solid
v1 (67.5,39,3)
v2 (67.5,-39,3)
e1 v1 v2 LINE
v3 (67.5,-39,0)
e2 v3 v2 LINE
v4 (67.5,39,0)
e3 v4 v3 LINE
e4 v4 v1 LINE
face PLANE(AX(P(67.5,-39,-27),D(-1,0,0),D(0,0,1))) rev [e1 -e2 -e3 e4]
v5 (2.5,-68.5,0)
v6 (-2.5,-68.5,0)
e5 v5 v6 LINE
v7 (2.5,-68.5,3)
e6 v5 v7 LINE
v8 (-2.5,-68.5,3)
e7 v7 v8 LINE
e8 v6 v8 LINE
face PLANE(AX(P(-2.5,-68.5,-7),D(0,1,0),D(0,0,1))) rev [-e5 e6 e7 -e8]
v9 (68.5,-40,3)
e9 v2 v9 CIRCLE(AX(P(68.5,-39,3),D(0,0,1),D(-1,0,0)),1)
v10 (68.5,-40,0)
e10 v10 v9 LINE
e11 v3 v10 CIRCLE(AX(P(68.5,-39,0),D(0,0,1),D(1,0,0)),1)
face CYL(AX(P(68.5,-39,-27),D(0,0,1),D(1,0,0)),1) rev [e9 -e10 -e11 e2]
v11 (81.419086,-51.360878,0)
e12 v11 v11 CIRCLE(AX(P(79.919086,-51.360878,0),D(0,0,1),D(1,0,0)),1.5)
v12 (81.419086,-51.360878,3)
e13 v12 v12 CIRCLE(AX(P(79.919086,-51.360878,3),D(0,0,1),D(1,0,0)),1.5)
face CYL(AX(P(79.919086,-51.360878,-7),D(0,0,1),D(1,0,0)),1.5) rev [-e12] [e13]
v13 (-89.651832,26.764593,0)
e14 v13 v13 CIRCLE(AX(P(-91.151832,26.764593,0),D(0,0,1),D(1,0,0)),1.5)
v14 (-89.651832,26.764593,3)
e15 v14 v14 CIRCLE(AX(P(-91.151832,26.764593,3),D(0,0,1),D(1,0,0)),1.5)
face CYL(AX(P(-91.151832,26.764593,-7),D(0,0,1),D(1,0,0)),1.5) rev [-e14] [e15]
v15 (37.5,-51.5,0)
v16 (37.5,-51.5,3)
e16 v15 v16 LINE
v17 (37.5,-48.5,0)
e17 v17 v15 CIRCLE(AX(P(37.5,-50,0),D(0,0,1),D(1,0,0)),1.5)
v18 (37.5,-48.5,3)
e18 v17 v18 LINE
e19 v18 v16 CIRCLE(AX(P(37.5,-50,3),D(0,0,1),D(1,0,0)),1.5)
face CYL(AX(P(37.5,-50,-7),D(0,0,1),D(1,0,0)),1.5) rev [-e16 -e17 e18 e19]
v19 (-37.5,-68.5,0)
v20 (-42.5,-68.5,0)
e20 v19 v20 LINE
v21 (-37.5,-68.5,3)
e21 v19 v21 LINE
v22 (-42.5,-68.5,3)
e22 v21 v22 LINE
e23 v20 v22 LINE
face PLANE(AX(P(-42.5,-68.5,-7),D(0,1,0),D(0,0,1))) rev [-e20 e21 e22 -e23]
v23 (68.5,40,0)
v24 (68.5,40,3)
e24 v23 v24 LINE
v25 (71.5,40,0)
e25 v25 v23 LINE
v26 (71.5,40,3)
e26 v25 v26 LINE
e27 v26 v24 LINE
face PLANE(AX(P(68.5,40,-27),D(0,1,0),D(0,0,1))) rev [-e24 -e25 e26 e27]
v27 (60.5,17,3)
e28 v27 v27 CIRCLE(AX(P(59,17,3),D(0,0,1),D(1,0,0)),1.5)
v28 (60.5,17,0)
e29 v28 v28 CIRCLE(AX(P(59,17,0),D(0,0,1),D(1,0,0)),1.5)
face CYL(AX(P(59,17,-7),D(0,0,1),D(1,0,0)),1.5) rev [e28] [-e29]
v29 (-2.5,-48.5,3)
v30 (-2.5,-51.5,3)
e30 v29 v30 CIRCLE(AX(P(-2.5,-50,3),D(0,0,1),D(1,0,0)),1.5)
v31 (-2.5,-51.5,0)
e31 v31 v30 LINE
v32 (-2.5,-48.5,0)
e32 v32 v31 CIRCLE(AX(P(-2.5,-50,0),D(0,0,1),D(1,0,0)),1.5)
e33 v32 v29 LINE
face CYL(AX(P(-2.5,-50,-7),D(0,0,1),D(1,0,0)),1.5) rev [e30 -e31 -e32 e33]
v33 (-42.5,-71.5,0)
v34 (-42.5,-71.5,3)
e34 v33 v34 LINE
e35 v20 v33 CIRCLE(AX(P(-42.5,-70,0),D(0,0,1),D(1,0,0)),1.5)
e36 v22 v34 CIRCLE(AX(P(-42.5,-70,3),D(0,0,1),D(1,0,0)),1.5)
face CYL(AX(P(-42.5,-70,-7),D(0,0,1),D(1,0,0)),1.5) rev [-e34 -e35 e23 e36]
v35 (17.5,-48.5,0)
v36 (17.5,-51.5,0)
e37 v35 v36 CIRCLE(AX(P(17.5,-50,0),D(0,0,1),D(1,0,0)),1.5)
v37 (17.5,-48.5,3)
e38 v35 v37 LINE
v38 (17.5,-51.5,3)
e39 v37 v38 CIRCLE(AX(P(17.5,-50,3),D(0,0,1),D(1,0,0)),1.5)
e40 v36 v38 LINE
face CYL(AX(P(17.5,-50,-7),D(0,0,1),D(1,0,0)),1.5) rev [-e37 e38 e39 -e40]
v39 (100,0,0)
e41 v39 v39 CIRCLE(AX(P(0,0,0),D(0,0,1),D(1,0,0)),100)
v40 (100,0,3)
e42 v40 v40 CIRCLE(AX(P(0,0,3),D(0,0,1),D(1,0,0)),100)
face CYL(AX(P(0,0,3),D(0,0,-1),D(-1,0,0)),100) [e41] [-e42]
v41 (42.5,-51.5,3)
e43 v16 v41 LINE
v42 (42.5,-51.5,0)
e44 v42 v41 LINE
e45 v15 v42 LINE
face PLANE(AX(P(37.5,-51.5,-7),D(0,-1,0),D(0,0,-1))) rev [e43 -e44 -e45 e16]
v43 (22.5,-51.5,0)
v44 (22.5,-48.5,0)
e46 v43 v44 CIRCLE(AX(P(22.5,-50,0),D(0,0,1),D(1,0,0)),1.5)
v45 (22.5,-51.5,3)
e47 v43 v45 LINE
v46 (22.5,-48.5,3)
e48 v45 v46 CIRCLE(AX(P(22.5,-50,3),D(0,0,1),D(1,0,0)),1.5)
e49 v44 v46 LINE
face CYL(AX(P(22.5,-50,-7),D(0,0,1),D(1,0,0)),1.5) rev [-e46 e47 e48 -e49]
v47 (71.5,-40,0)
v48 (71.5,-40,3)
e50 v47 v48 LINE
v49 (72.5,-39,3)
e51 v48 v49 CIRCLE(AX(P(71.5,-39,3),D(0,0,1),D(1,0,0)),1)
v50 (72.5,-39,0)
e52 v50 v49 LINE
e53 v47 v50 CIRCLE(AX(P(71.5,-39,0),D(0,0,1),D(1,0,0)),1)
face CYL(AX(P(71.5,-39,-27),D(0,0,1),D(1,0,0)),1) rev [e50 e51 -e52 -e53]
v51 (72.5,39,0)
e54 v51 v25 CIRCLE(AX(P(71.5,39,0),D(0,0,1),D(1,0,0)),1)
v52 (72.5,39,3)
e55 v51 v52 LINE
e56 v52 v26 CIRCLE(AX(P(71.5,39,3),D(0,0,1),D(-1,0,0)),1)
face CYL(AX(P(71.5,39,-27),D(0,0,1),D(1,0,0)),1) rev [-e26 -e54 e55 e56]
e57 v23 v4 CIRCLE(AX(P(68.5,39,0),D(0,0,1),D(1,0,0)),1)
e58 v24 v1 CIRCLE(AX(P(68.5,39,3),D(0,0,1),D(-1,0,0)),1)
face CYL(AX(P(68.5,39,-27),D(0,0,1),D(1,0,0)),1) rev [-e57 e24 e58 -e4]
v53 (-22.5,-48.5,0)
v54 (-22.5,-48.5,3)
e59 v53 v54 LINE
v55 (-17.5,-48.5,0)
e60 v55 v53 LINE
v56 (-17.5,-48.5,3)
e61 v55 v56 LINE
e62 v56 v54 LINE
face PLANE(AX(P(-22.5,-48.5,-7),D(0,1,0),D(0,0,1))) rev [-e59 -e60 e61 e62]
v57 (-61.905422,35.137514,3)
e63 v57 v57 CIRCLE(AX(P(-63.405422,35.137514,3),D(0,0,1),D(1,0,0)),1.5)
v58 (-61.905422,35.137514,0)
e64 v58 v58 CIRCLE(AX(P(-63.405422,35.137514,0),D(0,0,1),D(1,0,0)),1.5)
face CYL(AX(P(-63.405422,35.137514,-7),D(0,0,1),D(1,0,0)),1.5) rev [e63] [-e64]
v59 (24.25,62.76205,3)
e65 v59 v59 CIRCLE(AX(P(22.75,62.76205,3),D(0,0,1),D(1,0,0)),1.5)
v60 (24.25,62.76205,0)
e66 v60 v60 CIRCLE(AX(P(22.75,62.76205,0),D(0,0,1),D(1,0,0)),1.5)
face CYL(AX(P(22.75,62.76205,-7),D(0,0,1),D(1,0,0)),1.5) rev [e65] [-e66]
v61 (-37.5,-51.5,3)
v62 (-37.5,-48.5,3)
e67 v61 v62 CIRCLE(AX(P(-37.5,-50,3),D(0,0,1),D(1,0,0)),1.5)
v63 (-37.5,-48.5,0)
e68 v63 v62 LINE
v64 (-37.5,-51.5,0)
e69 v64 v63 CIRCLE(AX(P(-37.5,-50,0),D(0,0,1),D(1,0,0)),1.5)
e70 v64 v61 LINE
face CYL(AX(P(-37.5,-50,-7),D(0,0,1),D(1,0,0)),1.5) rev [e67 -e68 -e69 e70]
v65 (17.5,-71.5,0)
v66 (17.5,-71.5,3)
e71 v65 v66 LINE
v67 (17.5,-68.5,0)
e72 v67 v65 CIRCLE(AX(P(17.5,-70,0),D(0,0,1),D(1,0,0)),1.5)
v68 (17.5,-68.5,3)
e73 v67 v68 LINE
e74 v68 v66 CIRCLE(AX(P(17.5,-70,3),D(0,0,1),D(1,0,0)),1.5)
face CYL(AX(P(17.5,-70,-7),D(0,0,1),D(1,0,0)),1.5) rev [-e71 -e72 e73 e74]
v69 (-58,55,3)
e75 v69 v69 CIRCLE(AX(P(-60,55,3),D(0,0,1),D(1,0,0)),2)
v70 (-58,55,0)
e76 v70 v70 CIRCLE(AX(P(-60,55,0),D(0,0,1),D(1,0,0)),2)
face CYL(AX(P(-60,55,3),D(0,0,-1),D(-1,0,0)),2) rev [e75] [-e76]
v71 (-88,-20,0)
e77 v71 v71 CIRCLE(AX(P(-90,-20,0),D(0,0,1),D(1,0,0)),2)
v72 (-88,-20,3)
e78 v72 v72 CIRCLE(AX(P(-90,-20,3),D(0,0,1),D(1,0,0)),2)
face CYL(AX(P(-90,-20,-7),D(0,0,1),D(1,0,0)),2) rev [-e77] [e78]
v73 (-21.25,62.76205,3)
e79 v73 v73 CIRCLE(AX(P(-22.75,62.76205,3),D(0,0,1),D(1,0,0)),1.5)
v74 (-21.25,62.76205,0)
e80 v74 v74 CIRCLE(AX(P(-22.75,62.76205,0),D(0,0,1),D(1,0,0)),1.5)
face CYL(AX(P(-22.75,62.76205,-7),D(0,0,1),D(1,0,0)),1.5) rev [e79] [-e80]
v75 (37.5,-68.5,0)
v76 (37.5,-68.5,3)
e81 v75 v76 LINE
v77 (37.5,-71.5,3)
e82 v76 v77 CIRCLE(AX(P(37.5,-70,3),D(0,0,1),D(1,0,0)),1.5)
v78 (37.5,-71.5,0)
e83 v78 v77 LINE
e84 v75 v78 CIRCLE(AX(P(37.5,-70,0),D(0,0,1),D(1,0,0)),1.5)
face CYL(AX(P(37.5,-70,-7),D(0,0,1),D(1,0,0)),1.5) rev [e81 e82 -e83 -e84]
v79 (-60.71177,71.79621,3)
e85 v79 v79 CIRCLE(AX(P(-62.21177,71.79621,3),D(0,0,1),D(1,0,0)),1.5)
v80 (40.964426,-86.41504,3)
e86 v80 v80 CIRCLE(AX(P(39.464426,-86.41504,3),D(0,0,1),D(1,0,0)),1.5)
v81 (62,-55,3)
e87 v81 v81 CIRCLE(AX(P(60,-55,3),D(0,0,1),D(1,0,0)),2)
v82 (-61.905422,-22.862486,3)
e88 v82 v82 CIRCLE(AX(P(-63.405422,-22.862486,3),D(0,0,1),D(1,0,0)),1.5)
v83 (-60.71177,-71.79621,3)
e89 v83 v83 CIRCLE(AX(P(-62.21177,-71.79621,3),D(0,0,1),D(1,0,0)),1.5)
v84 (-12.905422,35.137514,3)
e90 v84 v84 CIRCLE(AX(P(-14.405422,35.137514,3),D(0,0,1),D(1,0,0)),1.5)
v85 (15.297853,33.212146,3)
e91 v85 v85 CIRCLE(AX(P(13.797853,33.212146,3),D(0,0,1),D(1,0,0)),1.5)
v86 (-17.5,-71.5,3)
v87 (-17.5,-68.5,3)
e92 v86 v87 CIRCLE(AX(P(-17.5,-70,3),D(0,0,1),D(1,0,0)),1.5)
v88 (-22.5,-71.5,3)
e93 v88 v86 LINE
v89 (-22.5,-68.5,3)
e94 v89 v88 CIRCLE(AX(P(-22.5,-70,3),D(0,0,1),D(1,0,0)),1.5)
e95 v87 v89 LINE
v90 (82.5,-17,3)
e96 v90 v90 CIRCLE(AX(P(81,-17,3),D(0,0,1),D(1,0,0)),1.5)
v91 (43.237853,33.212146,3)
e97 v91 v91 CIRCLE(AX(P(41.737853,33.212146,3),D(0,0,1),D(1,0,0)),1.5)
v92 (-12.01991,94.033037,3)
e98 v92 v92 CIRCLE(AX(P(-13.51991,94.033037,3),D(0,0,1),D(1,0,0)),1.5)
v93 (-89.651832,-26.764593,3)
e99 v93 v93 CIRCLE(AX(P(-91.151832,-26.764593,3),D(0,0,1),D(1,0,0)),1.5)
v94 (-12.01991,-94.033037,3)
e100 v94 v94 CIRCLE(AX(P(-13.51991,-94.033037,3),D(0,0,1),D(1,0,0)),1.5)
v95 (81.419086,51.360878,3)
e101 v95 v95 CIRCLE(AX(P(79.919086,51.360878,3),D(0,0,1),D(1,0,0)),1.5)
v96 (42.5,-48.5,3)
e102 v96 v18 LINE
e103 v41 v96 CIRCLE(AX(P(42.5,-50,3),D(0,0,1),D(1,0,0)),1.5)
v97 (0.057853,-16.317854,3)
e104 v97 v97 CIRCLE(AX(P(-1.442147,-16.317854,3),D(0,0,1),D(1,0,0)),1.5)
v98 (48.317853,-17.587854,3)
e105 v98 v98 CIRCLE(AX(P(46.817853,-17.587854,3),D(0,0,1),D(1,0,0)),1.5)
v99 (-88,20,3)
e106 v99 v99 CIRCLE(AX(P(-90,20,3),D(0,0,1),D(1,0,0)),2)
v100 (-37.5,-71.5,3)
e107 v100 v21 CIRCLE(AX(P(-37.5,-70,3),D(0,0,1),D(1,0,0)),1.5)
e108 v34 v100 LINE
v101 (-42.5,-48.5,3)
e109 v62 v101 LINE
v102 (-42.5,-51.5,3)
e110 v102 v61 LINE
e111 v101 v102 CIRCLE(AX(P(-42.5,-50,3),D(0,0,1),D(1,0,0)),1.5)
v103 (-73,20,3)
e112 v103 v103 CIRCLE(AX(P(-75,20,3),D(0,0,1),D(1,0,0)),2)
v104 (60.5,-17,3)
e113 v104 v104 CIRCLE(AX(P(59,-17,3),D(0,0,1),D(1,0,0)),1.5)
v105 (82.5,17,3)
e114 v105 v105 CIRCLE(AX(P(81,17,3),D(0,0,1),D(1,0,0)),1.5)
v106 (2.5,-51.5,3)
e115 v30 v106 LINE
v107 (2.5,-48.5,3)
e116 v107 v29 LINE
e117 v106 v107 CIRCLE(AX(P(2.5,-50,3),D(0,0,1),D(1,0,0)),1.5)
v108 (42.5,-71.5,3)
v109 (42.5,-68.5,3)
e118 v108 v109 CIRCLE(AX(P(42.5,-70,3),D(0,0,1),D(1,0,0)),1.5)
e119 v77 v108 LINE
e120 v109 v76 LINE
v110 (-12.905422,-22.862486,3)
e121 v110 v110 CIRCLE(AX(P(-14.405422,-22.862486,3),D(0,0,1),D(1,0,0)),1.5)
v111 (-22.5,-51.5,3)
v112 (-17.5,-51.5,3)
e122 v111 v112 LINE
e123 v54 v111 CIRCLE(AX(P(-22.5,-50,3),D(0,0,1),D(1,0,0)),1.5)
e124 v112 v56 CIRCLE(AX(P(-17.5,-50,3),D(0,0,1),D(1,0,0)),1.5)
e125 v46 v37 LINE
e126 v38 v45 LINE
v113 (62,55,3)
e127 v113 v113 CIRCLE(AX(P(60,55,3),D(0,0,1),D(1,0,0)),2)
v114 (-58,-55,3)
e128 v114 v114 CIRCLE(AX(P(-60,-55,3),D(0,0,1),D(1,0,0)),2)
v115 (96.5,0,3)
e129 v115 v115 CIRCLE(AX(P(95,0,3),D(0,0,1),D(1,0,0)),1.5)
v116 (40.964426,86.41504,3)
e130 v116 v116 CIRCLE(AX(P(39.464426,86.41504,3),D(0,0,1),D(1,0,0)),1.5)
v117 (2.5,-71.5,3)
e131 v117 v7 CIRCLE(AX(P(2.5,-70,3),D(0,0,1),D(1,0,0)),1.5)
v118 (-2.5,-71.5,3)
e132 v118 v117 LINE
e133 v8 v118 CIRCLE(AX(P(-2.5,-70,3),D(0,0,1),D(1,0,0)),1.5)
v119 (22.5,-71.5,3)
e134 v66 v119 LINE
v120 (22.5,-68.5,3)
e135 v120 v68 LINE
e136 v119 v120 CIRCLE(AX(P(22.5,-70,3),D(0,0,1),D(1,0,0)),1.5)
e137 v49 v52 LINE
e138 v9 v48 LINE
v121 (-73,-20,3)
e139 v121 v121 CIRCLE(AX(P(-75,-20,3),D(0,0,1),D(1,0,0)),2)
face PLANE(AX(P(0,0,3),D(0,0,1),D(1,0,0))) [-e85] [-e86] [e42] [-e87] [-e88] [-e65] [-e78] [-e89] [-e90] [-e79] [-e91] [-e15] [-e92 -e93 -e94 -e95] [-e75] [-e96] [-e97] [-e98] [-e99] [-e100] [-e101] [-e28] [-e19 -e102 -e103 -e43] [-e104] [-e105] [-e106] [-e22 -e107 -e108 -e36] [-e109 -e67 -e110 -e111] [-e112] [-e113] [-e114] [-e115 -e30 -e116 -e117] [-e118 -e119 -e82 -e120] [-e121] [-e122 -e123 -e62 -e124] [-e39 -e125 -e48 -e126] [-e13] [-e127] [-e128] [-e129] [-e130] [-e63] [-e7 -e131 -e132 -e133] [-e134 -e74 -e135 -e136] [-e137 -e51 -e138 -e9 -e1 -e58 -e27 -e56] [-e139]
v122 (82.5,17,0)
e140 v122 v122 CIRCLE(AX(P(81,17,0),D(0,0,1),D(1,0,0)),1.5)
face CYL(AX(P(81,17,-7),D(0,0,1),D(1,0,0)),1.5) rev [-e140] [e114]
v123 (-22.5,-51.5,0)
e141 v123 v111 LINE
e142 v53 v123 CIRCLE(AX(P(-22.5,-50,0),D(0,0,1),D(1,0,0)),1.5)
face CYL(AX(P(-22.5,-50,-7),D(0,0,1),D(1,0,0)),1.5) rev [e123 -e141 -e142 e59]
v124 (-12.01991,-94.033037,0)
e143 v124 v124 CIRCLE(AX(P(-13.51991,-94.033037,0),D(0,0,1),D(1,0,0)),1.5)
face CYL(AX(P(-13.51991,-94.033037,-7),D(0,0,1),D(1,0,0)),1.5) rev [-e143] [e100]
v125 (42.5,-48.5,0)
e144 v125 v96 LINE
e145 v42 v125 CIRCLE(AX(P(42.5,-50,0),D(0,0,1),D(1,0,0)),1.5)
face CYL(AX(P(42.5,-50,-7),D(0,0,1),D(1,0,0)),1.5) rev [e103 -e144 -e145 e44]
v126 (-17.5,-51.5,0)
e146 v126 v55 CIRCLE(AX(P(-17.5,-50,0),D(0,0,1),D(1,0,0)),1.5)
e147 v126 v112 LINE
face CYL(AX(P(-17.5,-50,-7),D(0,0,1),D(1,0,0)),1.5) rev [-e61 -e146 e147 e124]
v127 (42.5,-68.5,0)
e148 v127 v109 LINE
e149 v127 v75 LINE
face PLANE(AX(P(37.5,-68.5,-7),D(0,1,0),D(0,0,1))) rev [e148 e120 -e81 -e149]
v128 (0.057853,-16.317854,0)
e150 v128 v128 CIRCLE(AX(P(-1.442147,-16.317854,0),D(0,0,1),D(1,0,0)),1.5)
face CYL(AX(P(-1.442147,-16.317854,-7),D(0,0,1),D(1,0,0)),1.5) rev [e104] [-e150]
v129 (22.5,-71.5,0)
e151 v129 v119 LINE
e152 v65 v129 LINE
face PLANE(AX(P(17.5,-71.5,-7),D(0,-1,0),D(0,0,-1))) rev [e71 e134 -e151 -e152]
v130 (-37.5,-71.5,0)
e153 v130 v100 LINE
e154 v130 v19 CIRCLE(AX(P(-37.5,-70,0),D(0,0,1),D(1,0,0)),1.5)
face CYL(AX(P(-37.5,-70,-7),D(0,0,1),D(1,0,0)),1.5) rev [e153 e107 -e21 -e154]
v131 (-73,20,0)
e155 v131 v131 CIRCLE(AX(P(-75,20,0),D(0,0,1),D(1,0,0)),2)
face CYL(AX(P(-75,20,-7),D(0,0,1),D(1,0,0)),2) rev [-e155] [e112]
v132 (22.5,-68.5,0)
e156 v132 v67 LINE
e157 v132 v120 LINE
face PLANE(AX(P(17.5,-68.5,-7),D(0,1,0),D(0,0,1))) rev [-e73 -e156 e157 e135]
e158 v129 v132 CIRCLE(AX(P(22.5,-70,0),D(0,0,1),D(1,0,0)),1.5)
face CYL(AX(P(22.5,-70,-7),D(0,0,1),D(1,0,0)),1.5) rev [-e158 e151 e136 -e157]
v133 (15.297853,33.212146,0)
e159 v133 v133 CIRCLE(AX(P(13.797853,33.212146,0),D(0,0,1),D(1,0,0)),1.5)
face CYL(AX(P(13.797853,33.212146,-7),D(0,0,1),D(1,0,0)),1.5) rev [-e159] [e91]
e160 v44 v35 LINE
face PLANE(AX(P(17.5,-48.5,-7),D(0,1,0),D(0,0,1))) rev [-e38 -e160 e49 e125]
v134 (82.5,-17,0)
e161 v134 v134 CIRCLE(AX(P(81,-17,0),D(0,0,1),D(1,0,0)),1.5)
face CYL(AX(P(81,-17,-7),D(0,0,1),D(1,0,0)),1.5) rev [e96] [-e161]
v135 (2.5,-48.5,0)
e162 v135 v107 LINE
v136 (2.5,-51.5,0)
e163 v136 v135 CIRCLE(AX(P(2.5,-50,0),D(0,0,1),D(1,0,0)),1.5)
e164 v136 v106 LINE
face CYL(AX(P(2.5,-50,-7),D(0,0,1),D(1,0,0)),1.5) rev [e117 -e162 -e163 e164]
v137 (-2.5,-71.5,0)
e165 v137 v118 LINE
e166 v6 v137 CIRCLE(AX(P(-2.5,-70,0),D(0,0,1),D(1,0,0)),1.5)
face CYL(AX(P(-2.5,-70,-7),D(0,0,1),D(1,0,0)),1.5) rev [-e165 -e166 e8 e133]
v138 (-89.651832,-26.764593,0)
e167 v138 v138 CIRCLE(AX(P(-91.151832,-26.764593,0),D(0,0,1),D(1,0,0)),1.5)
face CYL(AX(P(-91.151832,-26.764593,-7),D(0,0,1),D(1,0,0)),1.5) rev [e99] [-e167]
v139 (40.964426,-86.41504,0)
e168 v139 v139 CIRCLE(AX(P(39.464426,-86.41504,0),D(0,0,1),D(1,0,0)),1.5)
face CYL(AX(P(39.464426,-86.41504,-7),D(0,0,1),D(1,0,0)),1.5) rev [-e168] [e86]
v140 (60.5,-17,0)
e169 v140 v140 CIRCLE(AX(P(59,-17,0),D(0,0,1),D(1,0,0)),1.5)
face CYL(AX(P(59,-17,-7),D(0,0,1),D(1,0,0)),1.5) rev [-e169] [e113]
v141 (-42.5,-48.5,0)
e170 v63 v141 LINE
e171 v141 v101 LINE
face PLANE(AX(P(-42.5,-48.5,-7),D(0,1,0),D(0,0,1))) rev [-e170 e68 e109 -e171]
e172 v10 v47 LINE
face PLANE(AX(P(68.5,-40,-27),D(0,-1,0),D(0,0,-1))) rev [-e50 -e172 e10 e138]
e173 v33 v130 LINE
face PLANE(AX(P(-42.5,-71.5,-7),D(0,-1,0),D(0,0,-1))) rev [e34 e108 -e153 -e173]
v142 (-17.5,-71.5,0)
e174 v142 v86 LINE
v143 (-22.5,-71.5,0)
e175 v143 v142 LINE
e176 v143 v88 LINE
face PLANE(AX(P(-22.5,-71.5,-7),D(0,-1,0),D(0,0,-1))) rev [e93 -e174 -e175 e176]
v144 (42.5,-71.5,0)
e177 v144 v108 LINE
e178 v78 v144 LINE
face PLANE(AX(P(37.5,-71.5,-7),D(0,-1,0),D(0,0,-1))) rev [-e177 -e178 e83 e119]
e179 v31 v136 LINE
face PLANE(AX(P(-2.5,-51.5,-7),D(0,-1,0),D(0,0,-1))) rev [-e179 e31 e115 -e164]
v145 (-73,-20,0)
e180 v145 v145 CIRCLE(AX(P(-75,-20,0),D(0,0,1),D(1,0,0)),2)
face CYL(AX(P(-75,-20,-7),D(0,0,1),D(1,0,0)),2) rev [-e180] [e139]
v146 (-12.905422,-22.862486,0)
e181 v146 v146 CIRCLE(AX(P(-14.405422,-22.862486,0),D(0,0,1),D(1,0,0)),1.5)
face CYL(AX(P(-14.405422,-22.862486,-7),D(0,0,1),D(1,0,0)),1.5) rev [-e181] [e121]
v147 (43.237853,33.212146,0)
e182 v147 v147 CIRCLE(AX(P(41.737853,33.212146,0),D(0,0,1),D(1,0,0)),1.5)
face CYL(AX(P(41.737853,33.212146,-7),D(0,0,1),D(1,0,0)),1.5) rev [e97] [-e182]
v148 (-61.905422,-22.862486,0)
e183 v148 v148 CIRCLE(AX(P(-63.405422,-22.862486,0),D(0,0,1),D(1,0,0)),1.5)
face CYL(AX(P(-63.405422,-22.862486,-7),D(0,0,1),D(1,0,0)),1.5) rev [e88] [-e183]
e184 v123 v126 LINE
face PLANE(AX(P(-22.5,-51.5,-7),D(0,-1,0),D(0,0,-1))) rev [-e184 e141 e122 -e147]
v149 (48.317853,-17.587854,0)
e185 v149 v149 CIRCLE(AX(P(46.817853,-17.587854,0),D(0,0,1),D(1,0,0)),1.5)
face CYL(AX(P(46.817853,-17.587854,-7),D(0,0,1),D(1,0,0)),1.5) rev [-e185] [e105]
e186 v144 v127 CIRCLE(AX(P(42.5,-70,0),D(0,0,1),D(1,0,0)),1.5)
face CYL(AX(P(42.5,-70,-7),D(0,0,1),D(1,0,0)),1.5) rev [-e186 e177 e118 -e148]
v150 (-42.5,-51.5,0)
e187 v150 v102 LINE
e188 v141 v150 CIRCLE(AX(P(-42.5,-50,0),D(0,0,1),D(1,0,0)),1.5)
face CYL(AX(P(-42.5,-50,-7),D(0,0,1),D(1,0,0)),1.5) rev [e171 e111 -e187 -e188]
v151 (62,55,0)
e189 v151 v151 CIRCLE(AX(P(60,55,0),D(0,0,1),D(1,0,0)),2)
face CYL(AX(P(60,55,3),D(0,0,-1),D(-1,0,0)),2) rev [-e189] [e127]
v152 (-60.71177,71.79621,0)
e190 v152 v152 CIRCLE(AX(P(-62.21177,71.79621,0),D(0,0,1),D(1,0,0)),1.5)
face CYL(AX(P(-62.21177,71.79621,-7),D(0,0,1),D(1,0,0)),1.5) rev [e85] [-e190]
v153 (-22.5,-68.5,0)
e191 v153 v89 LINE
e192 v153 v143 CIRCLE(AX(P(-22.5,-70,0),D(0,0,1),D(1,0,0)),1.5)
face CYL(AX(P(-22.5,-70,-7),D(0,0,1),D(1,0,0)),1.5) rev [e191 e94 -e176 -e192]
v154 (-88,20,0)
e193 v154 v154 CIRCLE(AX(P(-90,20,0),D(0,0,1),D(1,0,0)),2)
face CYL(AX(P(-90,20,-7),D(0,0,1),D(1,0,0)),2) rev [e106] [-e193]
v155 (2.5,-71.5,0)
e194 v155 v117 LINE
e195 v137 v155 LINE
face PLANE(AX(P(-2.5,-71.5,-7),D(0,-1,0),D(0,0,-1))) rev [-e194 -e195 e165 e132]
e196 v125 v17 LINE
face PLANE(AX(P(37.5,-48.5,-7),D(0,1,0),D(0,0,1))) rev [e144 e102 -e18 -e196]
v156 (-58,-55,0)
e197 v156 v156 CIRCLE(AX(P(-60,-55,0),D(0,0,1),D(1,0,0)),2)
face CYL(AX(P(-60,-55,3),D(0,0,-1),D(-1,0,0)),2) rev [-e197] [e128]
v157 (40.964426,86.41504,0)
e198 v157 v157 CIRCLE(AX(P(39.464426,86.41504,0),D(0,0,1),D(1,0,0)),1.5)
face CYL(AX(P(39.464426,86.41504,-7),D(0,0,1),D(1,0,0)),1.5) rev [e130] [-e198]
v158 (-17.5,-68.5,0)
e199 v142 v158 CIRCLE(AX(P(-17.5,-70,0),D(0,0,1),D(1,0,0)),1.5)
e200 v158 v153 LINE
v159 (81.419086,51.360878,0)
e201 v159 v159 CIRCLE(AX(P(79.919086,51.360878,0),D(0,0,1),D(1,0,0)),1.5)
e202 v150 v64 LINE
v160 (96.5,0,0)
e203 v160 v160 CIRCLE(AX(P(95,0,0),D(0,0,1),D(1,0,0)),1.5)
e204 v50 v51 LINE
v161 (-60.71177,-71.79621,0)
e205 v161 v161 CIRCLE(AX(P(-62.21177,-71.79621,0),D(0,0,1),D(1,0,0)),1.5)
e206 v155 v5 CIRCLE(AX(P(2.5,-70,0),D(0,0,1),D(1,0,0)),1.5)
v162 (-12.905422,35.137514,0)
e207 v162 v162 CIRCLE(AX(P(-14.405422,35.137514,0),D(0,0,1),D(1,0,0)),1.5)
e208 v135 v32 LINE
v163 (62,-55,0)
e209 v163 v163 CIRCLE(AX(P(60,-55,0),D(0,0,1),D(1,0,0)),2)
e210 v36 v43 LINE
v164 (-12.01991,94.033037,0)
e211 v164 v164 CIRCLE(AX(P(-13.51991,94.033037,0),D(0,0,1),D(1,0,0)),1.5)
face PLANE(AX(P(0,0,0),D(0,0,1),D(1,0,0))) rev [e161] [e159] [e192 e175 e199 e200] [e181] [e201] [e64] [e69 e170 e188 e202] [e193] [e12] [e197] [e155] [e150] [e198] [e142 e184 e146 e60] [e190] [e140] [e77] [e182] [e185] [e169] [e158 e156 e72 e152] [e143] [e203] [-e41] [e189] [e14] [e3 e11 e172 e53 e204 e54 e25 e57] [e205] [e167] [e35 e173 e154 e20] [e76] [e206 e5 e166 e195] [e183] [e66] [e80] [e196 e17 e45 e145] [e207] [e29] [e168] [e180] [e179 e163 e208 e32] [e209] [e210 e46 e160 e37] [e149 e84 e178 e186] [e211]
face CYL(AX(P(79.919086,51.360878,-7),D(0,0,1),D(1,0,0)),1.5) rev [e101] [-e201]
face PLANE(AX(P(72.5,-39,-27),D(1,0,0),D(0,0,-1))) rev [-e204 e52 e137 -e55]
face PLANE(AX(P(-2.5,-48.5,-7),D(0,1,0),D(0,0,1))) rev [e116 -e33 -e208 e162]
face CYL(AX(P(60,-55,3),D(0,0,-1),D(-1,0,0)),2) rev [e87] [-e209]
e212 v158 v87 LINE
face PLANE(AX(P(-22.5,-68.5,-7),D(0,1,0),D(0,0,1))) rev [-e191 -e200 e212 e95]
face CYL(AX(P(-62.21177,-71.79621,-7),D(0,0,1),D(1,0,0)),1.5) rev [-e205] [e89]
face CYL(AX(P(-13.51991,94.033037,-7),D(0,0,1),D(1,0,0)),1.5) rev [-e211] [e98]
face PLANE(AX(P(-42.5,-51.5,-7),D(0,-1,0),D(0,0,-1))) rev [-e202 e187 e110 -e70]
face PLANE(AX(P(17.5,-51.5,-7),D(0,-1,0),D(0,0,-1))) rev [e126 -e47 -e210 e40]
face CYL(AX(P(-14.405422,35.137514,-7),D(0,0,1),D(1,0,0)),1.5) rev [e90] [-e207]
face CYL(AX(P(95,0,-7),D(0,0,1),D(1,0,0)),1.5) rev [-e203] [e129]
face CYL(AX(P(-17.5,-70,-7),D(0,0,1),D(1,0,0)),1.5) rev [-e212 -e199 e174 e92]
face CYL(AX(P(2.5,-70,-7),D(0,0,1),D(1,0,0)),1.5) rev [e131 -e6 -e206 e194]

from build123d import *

# Parameters (mm, degrees)
EXTRUDE_1_OUTLINE_R   = 100
EXTRUDE_1_OUTLINE_R_2 = 2
EXTRUDE_1_DEPTH       = 3
CUT_EXTRUDE_1_DEPTH   = 30
SKETCH_6_R            = 1.5
SKETCH_6_R_2          = 2
CUT_EXTRUDE_2_DEPTH   = 10
CUT_EXTRUDE_4_DEPTH   = 10
SKETCH_9_R            = 1.5
CUT_EXTRUDE_5_DEPTH   = 10


# Read off the part's stored shape, not the designer's step: 填料-伸長1
with BuildPart() as part:
    # 填料-伸長1 outline → 填料-伸長1 (new body)
    with BuildSketch(Plane.XY):
        Circle(EXTRUDE_1_OUTLINE_R)
        with Locations((-60, -55)):
            Circle(EXTRUDE_1_OUTLINE_R_2, mode=Mode.SUBTRACT)
        with Locations((60, -55)):
            Circle(EXTRUDE_1_OUTLINE_R_2, mode=Mode.SUBTRACT)
        with Locations((-60, 55)):
            Circle(EXTRUDE_1_OUTLINE_R_2, mode=Mode.SUBTRACT)
        with Locations((60, 55)):
            Circle(EXTRUDE_1_OUTLINE_R_2, mode=Mode.SUBTRACT)
    extrude(amount=EXTRUDE_1_DEPTH)

    # 草圖5 → 除料-伸長1 (cut)
    with BuildSketch(Plane.XY.offset(3)):
        with BuildLine():
            Line((68.5, -40), (71.5, -40))
            ThreePointArc((71.5, -40), (72.207106781, -39.707106781), (72.5, -39))
            Line((72.5, -39), (72.5, 39))
            ThreePointArc((72.5, 39), (72.207106781, 39.707106781), (71.5, 40))
            Line((71.5, 40), (68.5, 40))
            ThreePointArc((68.5, 40), (67.792893219, 39.707106781), (67.5, 39))
            Line((67.5, 39), (67.5, -39))
            ThreePointArc((67.5, -39), (67.792893219, -39.707106781), (68.5, -40))
        make_face()
    extrude(amount=-CUT_EXTRUDE_1_DEPTH, mode=Mode.SUBTRACT)

    # 草圖6 → 除料-伸長2 (cut)
    with BuildSketch(Plane.XY.offset(3)):
        with Locations((-63.405422156, 35.137513831)):
            Circle(SKETCH_6_R)
        with Locations((-14.405422156, 35.137513831)):
            Circle(SKETCH_6_R)
        with Locations((-14.405422156, -22.862486169)):
            Circle(SKETCH_6_R)
        with Locations((-63.405422156, -22.862486169)):
            Circle(SKETCH_6_R)
        with Locations((41.73785257, 33.212145781)):
            Circle(SKETCH_6_R)
        with Locations((13.79785257, 33.212145781)):
            Circle(SKETCH_6_R)
        with Locations((-1.44214743, -16.317854219)):
            Circle(SKETCH_6_R)
        with Locations((46.81785257, -17.587854219)):
            Circle(SKETCH_6_R)
        with Locations((-22.75, 62.76204956)):
            Circle(SKETCH_6_R)
        with Locations((22.75, 62.76204956)):
            Circle(SKETCH_6_R)
        with Locations((59, 17)):
            Circle(SKETCH_6_R)
        with Locations((59, -17)):
            Circle(SKETCH_6_R)
        with Locations((81, -17)):
            Circle(SKETCH_6_R)
        with Locations((81, 17)):
            Circle(SKETCH_6_R)
        with Locations((-90, 20)):
            Circle(SKETCH_6_R_2)
        with Locations((-90, -20)):
            Circle(SKETCH_6_R_2)
        with Locations((-75, 20)):
            Circle(SKETCH_6_R_2)
        with Locations((-75, -20)):
            Circle(SKETCH_6_R_2)
    extrude(amount=-CUT_EXTRUDE_2_DEPTH, mode=Mode.SUBTRACT)

    # 草圖8 → 除料-伸長4 (cut)
    with BuildSketch(Plane.XY.offset(3)):
        with BuildLine():
            Line((-42.5, -48.5), (-37.5, -48.5))
            ThreePointArc((-37.5, -48.5), (-36, -50), (-37.5, -51.5))
            Line((-37.5, -51.5), (-42.5, -51.5))
            ThreePointArc((-42.5, -51.5), (-44, -50), (-42.5, -48.5))
        make_face()
        with BuildLine():
            Line((-22.5, -51.5), (-17.5, -51.5))
            ThreePointArc((-17.5, -51.5), (-16, -50), (-17.5, -48.5))
            Line((-17.5, -48.5), (-22.5, -48.5))
            ThreePointArc((-22.5, -48.5), (-24, -50), (-22.5, -51.5))
        make_face()
        with BuildLine():
            Line((-2.5, -51.5), (2.5, -51.5))
            ThreePointArc((2.5, -51.5), (4, -50), (2.5, -48.5))
            Line((2.5, -48.5), (-2.5, -48.5))
            ThreePointArc((-2.5, -48.5), (-4, -50), (-2.5, -51.5))
        make_face()
        with BuildLine():
            Line((17.5, -51.5), (22.5, -51.5))
            ThreePointArc((22.5, -51.5), (24, -50), (22.5, -48.5))
            Line((22.5, -48.5), (17.5, -48.5))
            ThreePointArc((17.5, -48.5), (16, -50), (17.5, -51.5))
        make_face()
        with BuildLine():
            Line((37.5, -51.5), (42.5, -51.5))
            ThreePointArc((42.5, -51.5), (44, -50), (42.5, -48.5))
            Line((42.5, -48.5), (37.5, -48.5))
            ThreePointArc((37.5, -48.5), (36, -50), (37.5, -51.5))
        make_face()
        with BuildLine():
            Line((-42.5, -68.5), (-37.5, -68.5))
            ThreePointArc((-37.5, -68.5), (-36, -70), (-37.5, -71.5))
            Line((-37.5, -71.5), (-42.5, -71.5))
            ThreePointArc((-42.5, -71.5), (-44, -70), (-42.5, -68.5))
        make_face()
        with BuildLine():
            Line((-22.5, -68.5), (-17.5, -68.5))
            ThreePointArc((-17.5, -68.5), (-16, -70), (-17.5, -71.5))
            Line((-17.5, -71.5), (-22.5, -71.5))
            ThreePointArc((-22.5, -71.5), (-24, -70), (-22.5, -68.5))
        make_face()
        with BuildLine():
            Line((-2.5, -68.5), (2.5, -68.5))
            ThreePointArc((2.5, -68.5), (4, -70), (2.5, -71.5))
            Line((2.5, -71.5), (-2.5, -71.5))
            ThreePointArc((-2.5, -71.5), (-4, -70), (-2.5, -68.5))
        make_face()
        with BuildLine():
            Line((17.5, -68.5), (22.5, -68.5))
            ThreePointArc((22.5, -68.5), (24, -70), (22.5, -71.5))
            Line((22.5, -71.5), (17.5, -71.5))
            ThreePointArc((17.5, -71.5), (16, -70), (17.5, -68.5))
        make_face()
        with BuildLine():
            Line((37.5, -68.5), (42.5, -68.5))
            ThreePointArc((42.5, -68.5), (44, -70), (42.5, -71.5))
            Line((42.5, -71.5), (37.5, -71.5))
            ThreePointArc((37.5, -71.5), (36, -70), (37.5, -68.5))
        make_face()
    extrude(amount=-CUT_EXTRUDE_4_DEPTH, mode=Mode.SUBTRACT)

    # 草圖9 → 除料-伸長5 (cut)
    with BuildSketch(Plane.XY.offset(3)):
        with Locations((95, 0)):
            Circle(SKETCH_9_R)
        with Locations((79.919085619, -51.360877658)):
            Circle(SKETCH_9_R)
        with Locations((39.464426235, -86.415039559)):
            Circle(SKETCH_9_R)
        with Locations((-13.519909636, -94.033036979)):
            Circle(SKETCH_9_R)
        with Locations((-62.211769725, -71.796209564)):
            Circle(SKETCH_9_R)
        with Locations((-91.151832493, -26.7645929)):
            Circle(SKETCH_9_R)
        with Locations((-91.151832493, 26.7645929)):
            Circle(SKETCH_9_R)
        with Locations((-62.211769725, 71.796209564)):
            Circle(SKETCH_9_R)
        with Locations((-13.519909636, 94.033036979)):
            Circle(SKETCH_9_R)
        with Locations((39.464426235, 86.415039559)):
            Circle(SKETCH_9_R)
        with Locations((79.919085619, 51.360877658)):
            Circle(SKETCH_9_R)
    extrude(amount=-CUT_EXTRUDE_5_DEPTH, mode=Mode.SUBTRACT)


solid = part.part
